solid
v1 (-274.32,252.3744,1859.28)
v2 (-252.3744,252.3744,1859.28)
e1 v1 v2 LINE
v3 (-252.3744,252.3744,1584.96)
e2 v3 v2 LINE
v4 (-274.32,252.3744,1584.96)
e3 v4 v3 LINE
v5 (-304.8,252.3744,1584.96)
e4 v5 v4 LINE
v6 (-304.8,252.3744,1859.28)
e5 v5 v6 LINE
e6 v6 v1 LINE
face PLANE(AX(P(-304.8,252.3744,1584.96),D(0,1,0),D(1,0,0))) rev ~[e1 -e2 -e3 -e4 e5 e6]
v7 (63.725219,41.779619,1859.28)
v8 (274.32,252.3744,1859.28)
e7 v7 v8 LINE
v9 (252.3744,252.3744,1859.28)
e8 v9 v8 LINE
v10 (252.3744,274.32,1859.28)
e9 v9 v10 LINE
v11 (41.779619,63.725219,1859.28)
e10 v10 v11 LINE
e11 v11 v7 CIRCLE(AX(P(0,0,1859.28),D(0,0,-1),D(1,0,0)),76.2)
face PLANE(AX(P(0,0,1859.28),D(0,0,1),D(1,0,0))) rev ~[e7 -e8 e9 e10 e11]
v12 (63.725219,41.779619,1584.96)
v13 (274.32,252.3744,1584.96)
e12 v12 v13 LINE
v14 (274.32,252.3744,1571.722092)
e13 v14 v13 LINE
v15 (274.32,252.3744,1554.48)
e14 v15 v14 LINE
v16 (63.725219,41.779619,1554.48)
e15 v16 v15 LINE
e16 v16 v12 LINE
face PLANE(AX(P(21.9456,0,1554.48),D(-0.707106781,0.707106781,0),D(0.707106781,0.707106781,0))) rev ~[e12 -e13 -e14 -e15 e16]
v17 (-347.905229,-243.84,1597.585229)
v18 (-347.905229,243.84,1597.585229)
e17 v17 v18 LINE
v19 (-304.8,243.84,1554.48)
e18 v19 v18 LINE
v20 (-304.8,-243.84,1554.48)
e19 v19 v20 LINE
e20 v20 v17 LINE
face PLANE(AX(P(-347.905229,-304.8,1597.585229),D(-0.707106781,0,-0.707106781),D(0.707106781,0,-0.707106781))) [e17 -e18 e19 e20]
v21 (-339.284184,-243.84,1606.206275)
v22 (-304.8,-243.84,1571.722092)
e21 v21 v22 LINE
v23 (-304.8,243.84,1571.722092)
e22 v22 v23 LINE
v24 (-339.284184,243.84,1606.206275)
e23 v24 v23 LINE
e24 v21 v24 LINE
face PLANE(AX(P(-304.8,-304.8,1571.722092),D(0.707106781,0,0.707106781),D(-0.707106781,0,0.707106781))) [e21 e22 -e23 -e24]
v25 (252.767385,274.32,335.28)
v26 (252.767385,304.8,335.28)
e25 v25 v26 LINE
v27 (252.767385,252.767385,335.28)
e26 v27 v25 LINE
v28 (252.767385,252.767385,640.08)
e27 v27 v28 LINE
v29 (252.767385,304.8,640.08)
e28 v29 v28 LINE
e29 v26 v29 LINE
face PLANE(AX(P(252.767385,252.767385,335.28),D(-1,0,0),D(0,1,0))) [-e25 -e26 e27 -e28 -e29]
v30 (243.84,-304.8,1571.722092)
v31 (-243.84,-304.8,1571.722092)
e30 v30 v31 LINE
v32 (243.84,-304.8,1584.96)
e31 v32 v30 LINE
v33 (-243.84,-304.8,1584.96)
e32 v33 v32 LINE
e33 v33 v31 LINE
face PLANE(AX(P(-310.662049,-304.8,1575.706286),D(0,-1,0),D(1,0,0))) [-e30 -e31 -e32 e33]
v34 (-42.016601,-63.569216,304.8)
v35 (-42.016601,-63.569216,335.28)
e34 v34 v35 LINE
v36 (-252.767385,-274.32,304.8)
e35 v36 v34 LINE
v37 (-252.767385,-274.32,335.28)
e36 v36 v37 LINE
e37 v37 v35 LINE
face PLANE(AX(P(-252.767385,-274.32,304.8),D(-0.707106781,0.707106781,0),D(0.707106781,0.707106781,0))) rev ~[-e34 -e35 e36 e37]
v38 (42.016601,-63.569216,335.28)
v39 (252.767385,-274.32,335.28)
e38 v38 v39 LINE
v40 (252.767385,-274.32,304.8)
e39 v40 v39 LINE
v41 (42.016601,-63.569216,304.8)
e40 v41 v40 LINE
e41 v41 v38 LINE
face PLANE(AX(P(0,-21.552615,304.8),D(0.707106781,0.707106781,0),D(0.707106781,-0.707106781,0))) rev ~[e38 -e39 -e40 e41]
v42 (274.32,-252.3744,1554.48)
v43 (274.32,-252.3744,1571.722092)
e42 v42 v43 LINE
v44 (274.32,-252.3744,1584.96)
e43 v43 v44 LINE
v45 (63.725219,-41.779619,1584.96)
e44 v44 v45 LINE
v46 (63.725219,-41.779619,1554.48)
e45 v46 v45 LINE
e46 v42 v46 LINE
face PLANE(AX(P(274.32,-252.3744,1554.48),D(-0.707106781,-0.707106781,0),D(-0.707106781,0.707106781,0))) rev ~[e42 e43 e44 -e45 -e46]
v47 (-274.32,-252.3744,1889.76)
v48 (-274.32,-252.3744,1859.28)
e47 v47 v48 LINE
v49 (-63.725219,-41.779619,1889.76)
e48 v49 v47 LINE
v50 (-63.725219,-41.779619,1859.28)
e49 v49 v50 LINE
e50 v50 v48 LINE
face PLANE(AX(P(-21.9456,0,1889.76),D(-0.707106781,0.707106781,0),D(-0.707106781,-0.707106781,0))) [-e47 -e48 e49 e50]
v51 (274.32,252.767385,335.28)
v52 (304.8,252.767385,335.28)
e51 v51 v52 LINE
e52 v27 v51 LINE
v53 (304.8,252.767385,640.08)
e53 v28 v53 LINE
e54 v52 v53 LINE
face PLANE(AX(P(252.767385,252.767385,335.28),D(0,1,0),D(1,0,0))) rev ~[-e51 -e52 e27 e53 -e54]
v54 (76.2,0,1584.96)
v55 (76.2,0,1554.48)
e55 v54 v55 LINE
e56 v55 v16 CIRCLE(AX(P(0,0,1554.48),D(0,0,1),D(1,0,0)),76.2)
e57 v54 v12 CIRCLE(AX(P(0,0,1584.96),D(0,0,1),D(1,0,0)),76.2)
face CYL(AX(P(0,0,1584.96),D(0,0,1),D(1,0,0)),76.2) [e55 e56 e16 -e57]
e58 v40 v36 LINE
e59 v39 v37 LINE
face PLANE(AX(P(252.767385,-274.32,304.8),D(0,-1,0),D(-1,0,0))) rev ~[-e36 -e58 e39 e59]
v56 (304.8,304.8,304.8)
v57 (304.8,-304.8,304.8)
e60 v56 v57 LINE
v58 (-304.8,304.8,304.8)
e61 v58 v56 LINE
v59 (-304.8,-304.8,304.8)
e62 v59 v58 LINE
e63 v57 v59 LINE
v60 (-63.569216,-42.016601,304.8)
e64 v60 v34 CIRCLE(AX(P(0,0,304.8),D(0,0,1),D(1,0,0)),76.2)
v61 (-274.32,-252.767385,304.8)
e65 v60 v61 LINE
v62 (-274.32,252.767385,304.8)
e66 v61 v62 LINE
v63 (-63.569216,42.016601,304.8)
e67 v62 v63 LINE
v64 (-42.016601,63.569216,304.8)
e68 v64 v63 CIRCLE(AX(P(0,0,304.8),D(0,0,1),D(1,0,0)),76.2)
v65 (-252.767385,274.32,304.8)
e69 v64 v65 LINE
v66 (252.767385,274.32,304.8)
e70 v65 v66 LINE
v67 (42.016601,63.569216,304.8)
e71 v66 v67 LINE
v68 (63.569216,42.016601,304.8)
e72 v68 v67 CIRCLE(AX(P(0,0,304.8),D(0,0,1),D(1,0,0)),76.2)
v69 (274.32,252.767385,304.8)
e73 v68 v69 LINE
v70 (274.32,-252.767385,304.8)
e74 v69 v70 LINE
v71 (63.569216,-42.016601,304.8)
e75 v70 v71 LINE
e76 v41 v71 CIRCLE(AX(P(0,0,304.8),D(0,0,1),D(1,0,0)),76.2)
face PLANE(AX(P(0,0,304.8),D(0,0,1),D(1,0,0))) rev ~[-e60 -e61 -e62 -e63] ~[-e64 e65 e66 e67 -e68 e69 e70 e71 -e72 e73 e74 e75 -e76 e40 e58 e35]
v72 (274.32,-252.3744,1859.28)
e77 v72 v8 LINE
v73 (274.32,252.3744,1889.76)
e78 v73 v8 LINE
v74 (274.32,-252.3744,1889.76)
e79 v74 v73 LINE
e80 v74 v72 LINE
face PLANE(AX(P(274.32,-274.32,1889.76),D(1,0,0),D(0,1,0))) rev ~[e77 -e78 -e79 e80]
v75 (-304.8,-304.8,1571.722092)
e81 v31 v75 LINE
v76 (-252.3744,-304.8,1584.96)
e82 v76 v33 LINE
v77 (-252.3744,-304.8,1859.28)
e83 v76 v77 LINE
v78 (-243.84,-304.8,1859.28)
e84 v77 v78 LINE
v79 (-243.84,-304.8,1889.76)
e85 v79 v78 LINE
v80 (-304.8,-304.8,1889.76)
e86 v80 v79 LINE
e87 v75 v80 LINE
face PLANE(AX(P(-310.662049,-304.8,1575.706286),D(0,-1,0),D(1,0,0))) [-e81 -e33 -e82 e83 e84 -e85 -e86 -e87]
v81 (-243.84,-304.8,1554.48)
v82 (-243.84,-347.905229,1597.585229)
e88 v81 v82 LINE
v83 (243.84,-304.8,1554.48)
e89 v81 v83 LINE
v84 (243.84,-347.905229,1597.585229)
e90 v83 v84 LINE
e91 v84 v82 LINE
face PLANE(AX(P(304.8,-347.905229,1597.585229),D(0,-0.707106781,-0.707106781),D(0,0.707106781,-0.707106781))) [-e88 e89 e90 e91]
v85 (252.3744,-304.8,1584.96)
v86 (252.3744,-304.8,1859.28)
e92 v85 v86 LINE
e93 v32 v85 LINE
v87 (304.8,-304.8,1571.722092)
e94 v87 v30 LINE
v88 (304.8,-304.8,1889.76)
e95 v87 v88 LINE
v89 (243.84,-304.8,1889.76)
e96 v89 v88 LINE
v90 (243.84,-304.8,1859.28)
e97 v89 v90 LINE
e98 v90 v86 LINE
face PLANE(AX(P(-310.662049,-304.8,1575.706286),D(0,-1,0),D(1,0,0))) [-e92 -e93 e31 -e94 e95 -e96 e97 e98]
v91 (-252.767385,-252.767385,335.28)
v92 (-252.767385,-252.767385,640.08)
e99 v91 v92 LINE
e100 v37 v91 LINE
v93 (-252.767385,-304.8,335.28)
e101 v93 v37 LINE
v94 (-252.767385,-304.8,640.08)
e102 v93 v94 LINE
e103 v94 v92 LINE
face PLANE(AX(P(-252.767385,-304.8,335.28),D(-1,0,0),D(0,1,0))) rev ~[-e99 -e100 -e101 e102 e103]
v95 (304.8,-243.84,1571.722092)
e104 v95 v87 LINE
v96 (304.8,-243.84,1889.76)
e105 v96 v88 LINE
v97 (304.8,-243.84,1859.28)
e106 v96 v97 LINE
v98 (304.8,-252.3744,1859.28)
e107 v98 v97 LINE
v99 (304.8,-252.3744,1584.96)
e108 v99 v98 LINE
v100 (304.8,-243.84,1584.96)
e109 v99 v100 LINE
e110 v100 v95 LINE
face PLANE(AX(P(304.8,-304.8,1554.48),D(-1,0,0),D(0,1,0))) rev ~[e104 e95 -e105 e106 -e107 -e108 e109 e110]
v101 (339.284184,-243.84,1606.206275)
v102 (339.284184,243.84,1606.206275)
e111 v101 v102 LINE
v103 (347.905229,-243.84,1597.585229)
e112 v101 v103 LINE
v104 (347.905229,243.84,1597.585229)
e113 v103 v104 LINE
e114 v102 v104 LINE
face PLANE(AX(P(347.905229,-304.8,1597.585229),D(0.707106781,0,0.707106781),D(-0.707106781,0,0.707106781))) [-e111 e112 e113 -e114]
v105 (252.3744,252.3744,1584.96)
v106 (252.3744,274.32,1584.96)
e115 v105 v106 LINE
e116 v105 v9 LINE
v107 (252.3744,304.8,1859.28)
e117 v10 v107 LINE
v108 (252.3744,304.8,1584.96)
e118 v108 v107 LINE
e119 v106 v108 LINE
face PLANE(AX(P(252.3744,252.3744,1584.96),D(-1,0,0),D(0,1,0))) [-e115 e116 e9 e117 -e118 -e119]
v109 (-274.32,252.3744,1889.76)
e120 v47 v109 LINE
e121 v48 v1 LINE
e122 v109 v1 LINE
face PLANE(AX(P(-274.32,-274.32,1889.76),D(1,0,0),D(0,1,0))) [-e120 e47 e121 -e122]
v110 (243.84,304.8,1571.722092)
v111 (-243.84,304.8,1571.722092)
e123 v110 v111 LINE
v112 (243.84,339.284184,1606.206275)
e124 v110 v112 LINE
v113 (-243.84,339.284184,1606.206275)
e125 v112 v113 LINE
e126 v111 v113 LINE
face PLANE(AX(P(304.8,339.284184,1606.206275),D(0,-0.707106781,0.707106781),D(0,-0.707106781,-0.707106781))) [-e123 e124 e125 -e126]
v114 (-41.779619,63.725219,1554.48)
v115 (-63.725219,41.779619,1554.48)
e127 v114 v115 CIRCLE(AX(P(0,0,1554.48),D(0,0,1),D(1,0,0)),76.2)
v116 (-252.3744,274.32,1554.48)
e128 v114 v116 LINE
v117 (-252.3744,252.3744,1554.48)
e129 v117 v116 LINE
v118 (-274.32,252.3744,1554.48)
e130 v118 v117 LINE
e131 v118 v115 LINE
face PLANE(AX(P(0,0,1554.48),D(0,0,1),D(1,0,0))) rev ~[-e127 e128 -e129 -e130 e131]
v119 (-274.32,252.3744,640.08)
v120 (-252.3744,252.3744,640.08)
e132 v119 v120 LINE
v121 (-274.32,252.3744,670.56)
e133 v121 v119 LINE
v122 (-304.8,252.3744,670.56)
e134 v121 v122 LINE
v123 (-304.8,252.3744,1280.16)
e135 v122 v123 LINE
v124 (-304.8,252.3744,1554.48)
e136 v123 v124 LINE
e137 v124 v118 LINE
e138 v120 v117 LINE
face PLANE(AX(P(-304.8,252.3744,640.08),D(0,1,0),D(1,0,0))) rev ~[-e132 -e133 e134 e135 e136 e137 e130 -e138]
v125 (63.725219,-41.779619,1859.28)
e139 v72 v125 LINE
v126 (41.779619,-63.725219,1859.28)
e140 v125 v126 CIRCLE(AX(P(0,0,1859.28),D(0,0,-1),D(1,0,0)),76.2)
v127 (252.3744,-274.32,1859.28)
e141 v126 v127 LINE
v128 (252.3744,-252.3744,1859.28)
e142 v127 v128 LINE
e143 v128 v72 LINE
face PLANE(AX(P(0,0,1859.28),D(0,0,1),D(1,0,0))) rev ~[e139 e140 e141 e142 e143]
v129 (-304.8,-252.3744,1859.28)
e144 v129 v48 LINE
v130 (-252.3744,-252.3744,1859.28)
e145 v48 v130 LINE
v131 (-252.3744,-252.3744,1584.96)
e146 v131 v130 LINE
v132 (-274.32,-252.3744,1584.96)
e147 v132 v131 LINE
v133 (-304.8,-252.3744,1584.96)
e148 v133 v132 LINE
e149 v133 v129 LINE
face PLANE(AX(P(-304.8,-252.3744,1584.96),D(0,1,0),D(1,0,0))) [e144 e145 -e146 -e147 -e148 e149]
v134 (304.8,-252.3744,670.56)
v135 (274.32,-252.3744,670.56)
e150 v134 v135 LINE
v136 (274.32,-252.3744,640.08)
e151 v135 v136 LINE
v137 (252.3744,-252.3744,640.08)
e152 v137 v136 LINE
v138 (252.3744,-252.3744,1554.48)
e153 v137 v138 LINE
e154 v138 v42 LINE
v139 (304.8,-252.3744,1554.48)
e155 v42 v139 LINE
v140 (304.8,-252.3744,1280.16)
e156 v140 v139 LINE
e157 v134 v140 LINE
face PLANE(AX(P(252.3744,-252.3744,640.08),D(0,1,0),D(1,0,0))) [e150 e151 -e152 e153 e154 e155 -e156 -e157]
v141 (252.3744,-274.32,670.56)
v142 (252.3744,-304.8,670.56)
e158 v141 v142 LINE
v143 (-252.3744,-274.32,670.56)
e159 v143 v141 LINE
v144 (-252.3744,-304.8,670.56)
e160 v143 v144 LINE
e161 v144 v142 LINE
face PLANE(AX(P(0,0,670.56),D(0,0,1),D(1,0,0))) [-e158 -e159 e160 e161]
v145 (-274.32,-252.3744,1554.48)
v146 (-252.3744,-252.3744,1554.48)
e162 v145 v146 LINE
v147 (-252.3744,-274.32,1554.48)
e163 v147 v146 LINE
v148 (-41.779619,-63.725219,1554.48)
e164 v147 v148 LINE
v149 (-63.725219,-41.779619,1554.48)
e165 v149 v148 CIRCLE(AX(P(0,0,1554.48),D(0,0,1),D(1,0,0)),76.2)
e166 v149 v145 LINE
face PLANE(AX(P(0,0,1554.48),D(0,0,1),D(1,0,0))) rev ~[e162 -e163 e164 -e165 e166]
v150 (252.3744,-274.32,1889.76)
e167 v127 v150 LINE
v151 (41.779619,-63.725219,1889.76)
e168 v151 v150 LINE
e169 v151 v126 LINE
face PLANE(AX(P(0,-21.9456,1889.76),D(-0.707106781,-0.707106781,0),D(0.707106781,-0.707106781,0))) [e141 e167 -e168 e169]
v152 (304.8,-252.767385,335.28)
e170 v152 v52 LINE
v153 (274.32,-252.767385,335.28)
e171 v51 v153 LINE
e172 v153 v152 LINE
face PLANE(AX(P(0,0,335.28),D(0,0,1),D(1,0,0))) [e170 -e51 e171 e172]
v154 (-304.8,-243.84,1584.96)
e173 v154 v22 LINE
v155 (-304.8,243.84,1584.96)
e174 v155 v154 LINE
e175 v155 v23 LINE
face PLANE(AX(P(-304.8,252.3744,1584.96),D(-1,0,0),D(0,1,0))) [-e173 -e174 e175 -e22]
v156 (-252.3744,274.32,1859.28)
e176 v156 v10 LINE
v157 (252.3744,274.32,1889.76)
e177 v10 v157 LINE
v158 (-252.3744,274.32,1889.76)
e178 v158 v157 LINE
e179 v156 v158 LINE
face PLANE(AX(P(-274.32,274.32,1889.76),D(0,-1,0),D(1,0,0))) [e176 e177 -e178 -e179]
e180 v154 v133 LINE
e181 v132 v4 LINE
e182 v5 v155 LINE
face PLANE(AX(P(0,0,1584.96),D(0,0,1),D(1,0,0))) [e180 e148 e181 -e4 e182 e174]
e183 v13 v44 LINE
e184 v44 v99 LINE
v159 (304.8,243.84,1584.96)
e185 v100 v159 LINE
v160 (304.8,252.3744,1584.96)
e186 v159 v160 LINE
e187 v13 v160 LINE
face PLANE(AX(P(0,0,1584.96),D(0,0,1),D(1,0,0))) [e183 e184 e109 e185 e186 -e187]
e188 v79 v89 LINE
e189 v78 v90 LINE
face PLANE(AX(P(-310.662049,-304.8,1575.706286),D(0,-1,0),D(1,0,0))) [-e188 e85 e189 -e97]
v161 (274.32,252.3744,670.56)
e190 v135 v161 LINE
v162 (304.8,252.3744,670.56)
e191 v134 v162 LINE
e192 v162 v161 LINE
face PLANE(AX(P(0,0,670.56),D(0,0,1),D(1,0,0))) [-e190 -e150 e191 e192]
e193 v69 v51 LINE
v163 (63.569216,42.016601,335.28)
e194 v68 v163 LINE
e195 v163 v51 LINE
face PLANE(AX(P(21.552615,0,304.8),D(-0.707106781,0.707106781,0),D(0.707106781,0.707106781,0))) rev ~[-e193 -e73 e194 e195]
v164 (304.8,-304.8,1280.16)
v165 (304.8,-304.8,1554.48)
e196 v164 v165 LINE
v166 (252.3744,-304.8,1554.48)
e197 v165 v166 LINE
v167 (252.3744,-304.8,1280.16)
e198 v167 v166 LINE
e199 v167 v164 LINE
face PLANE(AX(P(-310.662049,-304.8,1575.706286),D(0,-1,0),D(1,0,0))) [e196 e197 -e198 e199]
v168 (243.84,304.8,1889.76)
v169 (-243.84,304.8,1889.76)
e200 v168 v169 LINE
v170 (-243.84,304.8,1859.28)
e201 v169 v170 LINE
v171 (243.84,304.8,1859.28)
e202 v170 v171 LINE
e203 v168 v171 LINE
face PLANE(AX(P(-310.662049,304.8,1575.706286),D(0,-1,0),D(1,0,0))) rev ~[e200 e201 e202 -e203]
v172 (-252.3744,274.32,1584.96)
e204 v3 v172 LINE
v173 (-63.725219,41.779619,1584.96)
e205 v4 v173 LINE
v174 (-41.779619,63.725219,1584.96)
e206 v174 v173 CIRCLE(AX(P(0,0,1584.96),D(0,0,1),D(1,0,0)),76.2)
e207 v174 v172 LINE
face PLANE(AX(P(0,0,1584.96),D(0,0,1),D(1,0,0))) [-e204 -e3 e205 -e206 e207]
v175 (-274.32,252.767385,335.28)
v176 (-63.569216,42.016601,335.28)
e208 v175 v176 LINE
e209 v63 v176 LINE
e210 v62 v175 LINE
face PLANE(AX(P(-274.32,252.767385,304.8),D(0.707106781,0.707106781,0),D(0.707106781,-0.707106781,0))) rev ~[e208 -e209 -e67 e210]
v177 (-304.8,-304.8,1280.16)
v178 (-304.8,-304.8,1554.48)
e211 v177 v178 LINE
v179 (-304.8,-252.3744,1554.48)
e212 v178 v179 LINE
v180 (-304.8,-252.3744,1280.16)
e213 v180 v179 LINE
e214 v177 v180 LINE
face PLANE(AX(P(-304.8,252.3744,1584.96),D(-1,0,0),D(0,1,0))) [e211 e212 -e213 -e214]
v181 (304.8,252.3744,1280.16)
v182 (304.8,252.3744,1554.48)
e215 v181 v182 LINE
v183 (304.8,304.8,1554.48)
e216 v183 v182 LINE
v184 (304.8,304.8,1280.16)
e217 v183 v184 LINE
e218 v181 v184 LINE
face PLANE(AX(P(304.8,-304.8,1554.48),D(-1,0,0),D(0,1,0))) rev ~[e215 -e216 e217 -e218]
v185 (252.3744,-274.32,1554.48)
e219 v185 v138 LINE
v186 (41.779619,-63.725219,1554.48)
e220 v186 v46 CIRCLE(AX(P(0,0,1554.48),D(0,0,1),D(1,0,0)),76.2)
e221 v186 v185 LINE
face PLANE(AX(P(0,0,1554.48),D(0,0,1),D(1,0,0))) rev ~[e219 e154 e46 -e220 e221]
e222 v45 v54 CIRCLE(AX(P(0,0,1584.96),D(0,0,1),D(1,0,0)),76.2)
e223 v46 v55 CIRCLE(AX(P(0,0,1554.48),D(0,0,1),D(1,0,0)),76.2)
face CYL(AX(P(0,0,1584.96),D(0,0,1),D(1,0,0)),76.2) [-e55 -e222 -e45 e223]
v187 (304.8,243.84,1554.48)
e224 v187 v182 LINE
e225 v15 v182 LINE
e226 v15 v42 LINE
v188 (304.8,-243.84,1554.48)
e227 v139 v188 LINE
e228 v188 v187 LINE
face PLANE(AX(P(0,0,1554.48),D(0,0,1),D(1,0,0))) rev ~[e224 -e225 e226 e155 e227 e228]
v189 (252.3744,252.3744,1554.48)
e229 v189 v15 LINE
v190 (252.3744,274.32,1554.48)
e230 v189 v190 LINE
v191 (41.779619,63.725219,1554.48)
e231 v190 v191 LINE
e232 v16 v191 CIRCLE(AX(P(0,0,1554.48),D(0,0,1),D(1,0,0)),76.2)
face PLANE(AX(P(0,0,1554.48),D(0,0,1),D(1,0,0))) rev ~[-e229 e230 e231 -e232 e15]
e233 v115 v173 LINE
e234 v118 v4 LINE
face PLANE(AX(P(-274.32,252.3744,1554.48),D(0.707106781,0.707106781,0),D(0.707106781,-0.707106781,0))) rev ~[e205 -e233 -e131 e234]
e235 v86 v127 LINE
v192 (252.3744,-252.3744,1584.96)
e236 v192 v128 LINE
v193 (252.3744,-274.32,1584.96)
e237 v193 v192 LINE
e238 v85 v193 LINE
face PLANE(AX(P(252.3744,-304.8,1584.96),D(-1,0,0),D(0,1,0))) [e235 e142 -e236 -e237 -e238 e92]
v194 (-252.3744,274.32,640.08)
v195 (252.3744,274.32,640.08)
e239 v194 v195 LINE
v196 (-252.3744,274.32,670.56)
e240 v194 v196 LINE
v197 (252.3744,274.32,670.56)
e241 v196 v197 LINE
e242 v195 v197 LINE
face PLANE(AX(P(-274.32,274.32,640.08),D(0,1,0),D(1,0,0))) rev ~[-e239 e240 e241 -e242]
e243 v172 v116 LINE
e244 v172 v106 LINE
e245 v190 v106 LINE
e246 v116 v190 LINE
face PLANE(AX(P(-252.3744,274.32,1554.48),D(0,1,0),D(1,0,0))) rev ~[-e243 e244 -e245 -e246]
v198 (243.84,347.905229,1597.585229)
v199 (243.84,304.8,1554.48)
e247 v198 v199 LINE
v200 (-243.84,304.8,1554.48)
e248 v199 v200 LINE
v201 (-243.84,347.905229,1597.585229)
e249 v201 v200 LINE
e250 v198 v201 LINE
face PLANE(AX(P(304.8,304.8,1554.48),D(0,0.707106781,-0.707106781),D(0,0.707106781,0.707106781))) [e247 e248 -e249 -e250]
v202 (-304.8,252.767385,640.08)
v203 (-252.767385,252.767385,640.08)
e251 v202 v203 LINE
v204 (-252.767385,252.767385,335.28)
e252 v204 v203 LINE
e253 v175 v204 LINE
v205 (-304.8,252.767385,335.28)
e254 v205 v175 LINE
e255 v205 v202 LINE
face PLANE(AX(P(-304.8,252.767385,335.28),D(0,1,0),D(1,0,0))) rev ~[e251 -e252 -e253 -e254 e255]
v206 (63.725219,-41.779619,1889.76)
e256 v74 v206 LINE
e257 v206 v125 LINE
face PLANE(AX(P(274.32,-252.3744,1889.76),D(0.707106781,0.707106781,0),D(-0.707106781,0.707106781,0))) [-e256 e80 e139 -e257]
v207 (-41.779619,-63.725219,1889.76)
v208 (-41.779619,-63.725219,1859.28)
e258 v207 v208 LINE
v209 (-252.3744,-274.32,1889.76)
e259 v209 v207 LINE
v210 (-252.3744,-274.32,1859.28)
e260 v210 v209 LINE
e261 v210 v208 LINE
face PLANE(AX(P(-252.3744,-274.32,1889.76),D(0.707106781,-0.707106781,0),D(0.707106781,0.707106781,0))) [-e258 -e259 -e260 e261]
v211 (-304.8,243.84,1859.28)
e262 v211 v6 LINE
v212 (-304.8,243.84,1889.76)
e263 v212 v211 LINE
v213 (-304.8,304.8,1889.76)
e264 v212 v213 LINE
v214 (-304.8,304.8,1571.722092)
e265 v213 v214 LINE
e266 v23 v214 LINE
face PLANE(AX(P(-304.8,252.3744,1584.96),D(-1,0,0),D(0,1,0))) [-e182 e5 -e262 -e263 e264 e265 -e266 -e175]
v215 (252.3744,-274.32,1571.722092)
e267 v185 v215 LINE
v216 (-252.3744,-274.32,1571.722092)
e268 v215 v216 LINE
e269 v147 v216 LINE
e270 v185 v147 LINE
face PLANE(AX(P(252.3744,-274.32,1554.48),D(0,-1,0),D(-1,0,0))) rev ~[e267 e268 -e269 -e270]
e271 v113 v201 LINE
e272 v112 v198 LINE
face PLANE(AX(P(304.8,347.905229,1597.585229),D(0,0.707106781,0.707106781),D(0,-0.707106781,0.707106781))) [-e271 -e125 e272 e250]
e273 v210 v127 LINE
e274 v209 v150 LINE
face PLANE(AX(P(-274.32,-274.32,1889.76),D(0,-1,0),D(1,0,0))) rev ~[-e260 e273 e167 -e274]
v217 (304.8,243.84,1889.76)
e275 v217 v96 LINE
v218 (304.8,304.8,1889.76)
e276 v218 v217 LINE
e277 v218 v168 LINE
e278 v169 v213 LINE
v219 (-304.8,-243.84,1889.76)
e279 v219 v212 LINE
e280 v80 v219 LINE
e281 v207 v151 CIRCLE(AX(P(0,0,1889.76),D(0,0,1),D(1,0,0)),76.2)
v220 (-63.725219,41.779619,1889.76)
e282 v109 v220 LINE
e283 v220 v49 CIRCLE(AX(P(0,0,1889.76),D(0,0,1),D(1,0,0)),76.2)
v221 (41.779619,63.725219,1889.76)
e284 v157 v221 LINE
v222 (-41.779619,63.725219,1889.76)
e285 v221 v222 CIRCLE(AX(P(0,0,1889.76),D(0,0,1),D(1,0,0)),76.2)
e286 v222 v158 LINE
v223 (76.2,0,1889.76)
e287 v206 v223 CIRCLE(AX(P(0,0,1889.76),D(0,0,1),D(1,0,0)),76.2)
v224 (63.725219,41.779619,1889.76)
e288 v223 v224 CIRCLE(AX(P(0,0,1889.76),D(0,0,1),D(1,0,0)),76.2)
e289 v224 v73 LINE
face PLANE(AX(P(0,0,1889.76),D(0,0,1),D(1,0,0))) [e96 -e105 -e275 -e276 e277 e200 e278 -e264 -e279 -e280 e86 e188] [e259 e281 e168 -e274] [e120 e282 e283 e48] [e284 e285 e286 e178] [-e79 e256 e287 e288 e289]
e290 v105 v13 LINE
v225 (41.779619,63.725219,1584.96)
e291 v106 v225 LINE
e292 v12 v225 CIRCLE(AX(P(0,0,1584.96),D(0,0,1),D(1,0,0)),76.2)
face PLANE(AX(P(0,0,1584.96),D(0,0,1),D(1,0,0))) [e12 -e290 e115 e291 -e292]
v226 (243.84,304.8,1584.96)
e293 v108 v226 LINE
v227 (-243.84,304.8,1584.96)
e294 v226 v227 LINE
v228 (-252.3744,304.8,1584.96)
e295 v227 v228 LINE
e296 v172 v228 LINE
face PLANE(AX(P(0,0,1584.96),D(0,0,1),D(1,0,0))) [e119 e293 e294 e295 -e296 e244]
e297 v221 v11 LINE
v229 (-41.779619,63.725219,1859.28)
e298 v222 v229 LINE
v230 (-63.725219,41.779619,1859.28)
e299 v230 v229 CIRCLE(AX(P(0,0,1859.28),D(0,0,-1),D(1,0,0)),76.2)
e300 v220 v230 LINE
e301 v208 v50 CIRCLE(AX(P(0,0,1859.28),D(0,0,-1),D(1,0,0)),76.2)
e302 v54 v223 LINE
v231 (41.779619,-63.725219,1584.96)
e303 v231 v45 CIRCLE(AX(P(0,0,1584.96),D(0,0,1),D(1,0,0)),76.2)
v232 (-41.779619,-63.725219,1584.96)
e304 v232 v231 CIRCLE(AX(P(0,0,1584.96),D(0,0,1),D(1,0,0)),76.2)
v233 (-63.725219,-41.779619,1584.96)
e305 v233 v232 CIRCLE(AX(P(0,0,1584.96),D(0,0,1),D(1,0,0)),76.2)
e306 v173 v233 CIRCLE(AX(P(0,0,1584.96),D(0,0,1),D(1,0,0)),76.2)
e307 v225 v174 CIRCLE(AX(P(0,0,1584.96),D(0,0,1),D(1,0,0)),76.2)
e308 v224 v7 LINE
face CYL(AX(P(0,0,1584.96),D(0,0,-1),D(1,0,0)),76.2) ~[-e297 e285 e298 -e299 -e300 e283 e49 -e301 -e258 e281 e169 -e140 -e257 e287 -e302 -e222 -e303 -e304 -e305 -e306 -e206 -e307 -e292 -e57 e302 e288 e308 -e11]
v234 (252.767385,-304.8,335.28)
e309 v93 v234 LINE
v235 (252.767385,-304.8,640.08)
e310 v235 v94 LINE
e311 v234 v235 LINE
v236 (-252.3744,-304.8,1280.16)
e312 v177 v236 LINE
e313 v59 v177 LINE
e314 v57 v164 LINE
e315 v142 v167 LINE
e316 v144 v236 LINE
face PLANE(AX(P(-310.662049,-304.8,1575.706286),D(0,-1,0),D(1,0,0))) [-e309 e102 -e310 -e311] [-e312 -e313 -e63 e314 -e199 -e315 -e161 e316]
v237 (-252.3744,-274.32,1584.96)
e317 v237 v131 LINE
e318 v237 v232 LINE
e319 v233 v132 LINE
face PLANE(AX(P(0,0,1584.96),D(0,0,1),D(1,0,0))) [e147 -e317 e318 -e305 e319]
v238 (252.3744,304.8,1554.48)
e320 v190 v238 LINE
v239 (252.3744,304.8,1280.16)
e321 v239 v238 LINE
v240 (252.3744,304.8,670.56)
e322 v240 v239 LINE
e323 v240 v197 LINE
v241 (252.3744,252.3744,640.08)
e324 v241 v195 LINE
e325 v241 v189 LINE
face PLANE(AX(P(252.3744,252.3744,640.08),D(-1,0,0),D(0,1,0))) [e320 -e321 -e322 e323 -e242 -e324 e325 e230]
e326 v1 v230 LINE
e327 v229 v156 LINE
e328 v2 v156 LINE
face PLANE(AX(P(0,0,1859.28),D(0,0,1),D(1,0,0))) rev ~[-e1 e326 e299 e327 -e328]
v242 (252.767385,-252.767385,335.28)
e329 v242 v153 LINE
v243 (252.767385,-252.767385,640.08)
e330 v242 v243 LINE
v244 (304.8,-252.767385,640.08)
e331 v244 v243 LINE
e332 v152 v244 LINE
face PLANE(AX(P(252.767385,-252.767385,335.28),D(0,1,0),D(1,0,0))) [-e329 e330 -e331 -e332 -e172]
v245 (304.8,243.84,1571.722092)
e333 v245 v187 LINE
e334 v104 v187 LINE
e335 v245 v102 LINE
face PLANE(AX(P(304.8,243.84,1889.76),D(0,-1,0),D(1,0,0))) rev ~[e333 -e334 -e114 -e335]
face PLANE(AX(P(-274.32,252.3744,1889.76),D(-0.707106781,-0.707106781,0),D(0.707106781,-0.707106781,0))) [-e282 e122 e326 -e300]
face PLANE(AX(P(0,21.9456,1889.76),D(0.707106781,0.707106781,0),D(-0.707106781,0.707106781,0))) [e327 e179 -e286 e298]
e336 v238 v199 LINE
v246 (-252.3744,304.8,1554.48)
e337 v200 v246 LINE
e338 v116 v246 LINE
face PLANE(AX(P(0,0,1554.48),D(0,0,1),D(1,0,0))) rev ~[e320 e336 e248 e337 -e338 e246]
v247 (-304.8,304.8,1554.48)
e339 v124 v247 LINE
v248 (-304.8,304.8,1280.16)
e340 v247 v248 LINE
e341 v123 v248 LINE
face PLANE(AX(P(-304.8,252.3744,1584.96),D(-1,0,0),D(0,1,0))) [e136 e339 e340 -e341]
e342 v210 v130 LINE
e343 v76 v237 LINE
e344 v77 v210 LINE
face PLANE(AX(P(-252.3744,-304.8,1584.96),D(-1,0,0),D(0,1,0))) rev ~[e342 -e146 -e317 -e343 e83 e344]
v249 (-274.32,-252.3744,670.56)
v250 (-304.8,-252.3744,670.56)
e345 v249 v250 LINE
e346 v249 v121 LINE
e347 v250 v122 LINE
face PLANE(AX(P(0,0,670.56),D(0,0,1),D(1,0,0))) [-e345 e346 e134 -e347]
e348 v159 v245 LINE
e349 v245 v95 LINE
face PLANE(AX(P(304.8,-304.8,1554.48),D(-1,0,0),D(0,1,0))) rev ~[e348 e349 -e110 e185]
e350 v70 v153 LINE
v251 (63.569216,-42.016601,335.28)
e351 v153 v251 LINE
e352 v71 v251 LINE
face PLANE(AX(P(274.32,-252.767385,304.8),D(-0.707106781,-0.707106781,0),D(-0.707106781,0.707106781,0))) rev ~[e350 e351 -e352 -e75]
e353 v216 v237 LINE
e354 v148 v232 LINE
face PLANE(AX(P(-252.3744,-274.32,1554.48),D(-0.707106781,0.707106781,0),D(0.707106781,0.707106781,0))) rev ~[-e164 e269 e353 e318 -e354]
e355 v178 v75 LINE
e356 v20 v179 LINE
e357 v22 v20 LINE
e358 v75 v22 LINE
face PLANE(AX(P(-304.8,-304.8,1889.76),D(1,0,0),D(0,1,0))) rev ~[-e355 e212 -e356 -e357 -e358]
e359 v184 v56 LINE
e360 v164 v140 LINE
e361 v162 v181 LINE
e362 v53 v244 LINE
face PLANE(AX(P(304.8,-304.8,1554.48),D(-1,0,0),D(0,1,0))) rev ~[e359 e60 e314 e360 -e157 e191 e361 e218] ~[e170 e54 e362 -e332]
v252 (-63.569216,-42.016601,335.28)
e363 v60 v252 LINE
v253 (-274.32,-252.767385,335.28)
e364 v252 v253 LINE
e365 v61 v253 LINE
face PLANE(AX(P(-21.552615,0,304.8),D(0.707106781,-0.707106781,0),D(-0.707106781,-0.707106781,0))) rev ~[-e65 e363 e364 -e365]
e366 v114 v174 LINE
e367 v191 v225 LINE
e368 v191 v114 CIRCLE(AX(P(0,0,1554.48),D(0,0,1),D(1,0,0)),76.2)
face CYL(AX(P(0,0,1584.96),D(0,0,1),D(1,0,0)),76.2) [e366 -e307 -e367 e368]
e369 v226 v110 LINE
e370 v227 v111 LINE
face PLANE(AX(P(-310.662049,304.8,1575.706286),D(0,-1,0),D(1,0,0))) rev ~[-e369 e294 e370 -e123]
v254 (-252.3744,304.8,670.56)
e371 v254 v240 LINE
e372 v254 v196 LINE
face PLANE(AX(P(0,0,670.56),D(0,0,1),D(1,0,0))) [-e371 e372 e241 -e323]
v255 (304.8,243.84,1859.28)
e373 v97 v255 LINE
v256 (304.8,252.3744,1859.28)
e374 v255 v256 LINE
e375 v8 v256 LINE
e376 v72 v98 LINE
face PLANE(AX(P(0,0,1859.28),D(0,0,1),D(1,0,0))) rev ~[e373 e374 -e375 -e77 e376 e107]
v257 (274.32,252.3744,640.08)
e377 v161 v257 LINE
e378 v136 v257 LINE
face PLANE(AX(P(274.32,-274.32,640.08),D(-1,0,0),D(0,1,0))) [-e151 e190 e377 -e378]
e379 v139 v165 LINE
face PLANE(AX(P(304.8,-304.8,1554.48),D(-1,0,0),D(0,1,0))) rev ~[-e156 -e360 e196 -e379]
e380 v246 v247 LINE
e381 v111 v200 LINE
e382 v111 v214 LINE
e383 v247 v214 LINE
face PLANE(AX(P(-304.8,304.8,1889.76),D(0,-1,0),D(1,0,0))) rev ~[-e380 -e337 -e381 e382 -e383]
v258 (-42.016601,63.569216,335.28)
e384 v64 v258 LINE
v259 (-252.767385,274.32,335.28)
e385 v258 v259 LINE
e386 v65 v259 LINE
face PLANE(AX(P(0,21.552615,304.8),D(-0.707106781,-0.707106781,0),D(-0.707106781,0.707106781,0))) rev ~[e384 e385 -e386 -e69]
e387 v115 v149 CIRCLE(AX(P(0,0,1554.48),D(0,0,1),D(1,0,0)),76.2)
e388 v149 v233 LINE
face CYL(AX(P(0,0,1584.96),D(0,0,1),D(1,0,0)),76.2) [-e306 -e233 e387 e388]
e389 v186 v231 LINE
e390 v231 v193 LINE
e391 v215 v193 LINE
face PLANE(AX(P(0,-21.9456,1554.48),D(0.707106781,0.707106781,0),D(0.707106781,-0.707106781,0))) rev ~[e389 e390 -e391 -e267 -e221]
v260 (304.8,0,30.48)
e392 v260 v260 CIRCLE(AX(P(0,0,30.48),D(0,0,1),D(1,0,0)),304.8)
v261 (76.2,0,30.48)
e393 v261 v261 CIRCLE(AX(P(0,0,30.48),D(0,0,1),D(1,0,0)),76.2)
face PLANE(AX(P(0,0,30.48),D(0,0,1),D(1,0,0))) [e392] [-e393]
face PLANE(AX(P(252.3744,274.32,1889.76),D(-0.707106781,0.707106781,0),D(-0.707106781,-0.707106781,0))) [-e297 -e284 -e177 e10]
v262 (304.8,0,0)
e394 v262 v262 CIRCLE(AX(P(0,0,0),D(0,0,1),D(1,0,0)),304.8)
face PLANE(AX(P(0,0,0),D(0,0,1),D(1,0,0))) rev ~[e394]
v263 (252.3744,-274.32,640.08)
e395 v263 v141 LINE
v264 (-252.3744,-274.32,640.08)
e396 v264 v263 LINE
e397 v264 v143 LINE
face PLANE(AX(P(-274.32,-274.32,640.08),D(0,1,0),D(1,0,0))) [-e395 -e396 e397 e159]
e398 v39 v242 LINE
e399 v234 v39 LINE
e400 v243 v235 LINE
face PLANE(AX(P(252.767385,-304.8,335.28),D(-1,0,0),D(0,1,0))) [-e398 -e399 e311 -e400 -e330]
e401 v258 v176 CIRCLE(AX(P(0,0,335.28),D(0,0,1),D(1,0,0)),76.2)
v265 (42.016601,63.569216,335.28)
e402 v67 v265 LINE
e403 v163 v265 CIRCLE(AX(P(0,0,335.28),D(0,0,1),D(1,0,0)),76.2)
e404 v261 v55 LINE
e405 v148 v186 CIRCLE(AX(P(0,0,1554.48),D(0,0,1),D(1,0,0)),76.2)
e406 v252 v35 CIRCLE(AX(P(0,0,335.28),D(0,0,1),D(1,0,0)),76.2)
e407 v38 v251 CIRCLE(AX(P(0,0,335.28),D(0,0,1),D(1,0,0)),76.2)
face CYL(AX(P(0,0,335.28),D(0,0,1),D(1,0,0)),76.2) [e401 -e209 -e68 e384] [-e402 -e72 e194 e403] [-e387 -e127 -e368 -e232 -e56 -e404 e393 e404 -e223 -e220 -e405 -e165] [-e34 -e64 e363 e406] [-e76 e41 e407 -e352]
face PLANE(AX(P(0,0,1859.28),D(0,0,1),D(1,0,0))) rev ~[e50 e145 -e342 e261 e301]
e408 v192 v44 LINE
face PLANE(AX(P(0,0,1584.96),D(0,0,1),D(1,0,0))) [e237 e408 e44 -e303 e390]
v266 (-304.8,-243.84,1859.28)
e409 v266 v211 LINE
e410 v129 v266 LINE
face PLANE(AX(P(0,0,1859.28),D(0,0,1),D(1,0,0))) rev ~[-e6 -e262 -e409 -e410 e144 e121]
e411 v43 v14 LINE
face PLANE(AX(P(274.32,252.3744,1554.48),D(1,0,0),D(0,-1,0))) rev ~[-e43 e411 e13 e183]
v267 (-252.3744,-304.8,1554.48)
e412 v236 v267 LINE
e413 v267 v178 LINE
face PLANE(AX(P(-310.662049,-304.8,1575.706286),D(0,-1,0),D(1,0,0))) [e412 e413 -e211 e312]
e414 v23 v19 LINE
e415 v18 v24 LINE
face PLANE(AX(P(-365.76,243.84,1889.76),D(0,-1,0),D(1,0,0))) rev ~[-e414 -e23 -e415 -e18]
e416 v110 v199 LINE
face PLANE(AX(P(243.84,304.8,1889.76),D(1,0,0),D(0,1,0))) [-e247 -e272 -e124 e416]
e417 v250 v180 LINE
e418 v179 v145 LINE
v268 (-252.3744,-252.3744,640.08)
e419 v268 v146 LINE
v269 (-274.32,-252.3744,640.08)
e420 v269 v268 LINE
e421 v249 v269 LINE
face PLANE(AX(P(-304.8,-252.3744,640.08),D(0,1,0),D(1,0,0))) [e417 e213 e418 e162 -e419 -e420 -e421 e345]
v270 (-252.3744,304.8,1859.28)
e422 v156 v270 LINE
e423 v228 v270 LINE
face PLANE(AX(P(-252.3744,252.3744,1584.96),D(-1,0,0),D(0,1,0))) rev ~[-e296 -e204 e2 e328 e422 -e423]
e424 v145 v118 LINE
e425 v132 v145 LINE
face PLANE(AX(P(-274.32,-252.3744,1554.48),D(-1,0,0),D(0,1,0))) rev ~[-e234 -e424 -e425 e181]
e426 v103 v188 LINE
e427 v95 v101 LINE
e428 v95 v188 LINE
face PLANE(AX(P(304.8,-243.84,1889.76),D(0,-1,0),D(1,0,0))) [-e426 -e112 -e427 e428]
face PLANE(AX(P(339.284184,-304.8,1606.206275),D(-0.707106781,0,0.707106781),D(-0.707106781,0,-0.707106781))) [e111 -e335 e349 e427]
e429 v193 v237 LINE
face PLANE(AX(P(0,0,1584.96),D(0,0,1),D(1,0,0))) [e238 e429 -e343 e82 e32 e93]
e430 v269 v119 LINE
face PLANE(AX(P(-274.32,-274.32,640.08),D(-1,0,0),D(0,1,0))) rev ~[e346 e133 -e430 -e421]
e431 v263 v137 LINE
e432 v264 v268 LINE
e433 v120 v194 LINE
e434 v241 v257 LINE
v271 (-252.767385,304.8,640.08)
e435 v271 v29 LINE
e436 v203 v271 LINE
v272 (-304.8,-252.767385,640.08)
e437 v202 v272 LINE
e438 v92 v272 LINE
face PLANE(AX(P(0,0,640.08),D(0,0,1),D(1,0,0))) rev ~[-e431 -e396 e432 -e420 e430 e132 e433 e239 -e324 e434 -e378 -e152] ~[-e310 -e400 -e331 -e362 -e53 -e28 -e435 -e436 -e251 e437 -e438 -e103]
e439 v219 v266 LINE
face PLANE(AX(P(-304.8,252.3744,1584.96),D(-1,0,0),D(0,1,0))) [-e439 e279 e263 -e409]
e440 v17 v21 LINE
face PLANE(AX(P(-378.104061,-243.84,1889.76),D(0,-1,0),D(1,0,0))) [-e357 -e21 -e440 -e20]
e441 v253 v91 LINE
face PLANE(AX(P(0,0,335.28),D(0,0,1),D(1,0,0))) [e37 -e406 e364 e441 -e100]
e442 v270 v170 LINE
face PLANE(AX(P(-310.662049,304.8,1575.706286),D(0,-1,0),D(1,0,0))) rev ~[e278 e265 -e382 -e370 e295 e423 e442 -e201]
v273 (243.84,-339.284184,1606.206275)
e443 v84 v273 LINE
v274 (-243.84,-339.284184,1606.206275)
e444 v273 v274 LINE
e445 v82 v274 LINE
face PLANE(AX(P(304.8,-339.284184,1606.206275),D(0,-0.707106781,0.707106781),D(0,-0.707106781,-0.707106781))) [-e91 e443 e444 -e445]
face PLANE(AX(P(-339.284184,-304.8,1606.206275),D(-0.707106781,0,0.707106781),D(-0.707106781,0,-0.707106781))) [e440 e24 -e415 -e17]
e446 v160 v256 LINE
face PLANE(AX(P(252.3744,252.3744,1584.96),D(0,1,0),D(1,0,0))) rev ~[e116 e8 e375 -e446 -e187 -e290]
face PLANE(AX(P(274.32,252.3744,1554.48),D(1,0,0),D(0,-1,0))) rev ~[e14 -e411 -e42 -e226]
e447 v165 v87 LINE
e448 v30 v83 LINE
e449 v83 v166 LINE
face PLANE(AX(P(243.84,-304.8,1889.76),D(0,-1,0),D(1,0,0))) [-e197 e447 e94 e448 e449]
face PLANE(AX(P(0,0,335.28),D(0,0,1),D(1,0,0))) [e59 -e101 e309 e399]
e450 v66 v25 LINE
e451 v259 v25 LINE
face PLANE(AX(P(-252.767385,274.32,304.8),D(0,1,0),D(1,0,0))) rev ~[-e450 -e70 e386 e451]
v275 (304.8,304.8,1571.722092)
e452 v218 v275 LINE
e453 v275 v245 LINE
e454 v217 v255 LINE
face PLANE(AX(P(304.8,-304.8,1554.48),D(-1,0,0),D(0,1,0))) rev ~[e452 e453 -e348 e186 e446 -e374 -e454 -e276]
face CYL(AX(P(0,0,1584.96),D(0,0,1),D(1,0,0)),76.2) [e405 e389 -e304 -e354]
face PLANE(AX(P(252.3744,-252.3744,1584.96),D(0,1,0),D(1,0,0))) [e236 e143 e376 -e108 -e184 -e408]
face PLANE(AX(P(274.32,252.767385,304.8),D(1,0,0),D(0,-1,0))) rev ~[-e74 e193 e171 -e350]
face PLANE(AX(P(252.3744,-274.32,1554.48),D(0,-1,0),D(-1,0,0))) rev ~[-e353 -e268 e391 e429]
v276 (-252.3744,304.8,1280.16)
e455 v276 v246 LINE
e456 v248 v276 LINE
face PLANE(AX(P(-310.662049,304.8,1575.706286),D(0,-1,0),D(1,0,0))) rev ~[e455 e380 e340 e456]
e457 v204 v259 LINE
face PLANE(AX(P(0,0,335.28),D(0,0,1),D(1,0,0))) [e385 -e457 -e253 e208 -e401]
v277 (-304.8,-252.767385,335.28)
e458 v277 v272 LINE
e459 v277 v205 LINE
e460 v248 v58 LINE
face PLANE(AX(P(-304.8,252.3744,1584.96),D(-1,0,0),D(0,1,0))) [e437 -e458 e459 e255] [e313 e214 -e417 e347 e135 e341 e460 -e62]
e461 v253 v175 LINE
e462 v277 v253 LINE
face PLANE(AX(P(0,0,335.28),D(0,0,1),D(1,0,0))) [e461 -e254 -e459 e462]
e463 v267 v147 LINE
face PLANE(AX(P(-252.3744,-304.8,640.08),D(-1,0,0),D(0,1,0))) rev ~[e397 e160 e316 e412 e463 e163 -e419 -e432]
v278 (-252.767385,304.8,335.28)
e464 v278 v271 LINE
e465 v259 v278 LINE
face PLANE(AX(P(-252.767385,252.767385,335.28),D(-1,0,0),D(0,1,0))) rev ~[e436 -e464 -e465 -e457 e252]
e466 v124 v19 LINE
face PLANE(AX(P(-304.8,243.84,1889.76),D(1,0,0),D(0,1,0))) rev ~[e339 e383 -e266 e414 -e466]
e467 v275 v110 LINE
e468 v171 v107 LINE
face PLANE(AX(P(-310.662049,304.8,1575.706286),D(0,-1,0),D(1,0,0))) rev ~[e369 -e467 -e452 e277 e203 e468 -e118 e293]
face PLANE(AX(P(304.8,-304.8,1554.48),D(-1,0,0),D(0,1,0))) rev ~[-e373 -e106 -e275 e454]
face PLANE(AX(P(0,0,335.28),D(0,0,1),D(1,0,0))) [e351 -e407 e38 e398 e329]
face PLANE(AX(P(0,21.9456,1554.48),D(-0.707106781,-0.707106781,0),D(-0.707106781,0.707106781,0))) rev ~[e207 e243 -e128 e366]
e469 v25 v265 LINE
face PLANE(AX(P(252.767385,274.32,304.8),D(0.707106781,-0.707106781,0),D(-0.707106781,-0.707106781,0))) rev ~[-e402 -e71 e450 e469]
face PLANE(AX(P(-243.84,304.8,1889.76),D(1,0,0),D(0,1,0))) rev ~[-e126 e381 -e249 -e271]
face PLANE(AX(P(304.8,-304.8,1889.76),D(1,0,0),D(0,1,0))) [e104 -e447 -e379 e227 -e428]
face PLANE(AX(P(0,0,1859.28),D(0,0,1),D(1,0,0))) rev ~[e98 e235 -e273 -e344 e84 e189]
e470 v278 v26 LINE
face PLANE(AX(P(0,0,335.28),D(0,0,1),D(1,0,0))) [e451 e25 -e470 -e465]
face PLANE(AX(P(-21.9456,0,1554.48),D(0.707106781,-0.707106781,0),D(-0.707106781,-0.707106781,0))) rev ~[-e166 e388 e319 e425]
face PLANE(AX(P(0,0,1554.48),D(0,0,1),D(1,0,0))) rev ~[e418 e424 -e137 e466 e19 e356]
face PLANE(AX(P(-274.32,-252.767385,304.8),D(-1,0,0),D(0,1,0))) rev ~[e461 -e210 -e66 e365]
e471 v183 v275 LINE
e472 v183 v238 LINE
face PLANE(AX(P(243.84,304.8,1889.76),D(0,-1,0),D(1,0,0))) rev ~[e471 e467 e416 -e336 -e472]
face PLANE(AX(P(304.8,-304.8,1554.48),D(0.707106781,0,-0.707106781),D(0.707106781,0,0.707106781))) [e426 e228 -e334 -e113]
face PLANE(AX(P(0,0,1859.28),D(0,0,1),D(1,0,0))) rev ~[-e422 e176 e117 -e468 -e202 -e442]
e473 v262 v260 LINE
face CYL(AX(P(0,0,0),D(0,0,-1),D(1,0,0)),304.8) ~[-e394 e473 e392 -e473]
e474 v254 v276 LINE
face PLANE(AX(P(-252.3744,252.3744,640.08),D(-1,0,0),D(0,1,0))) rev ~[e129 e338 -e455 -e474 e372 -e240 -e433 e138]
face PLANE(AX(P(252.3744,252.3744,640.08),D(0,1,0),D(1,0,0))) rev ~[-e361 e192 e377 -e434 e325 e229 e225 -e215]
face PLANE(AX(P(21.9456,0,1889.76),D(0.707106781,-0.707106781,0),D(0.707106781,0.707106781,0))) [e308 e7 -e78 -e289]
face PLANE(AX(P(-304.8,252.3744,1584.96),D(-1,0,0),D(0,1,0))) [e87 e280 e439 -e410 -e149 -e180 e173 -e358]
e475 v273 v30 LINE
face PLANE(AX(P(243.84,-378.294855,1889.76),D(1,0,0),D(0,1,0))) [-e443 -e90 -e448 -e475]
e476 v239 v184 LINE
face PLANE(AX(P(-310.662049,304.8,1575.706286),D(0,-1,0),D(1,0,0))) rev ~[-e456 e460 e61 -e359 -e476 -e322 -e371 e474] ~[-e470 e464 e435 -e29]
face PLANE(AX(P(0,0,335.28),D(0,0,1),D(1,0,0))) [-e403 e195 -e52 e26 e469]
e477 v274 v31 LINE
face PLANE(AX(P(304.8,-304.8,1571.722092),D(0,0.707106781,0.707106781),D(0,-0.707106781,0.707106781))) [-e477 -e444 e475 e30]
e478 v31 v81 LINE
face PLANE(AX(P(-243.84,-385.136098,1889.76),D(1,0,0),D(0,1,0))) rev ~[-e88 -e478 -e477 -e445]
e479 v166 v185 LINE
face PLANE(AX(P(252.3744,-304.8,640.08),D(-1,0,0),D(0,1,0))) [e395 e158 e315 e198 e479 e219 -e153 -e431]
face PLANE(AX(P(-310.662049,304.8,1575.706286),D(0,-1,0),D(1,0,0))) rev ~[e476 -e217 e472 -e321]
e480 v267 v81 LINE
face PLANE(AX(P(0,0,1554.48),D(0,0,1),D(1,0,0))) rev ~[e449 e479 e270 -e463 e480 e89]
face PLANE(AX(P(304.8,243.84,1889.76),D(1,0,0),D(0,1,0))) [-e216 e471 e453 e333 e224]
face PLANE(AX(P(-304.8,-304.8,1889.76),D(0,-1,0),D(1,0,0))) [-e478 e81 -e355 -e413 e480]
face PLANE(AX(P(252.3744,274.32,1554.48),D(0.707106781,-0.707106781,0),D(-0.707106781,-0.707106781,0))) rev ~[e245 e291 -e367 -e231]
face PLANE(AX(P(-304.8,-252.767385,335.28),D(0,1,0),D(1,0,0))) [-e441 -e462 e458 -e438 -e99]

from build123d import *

# Parameters (mm, degrees)
F0_R           = 304.8
F1_DEPTH       = 30.48
F2_R           = 76.2
F3_DEPTH       = 274.32
F4_W           = 609.6
F4_H           = 609.6
F5_DEPTH       = 30.48
F6_R           = 76.2
F6_W           = 52.0326146906
F6_H           = 52.0326146906
F7_DEPTH       = 304.8
F7_DEPTH_BACK  = 30.48
F8_W           = 609.6
F8_H           = 609.6
F8_W_2         = 548.64
F8_H_2         = 548.64
F9_DEPTH       = 30.48
F10_W          = 52.4256
F10_H          = 52.4256
F10_R          = 76.2
F11_DEPTH      = 914.4
F13_DEPTH      = 30.48
F14_W          = 52.4256
F14_H          = 52.4256
F14_R          = 76.2
F15_DEPTH      = 304.8
F15_DEPTH_BACK = 30.48
F16_W          = 609.6
F16_H          = 609.6
F16_W_2        = 548.64
F16_H_2        = 548.64
F17_DEPTH      = 30.48
F20_DEPTH      = 609.6
F22_DEPTH      = 609.6
F23_DEPTH      = 30.48
F24_W          = 60.96
F24_H          = 72.17660923
F24_H_2        = 60.96
F24_H_3        = 74.9131180763
F24_W_2        = 86.0498287201
F24_W_3        = 73.7356283188
F24_H_4        = 73.4948553562
F24_H_5        = 80.3360976696
F24_W_4        = 73.3040608883
F25_DEPTH      = 609.6


# Not quite as in the source:
# - a feature names something its author has since deleted; it is built from what else it names


with BuildPart() as f1:
    # F0 (on Top) → F1 (new body)
    with BuildSketch(Plane.XY):
        Circle(F0_R)
    extrude(amount=F1_DEPTH)

    # F2 (on face) → F3 (join)
    with BuildSketch(Plane.XY.offset(30.48)):
        Circle(F2_R)
    extrude(amount=F3_DEPTH)

    # F4 (on face) → F5 (join)
    with BuildSketch(Plane.XY.offset(304.8)):
        Rectangle(F4_W, F4_H)
        Polygon((-21.5526146906, 0), (-274.32, -252.7673853094), (-274.32, 252.7673853094), align=None, mode=Mode.SUBTRACT)
        Polygon((0, -21.5526146906), (252.7673853094, -274.32), (-252.7673853094, -274.32), align=None, mode=Mode.SUBTRACT)
        Polygon((-252.7673853094, 274.32), (252.7673853094, 274.32), (0, 21.5526146906), align=None, mode=Mode.SUBTRACT)
        Polygon((274.32, 252.7673853094), (274.32, -252.7673853094), (21.5526146906, 0), align=None, mode=Mode.SUBTRACT)
    extrude(amount=F5_DEPTH)

    # F6 (on face) → F7 (join, two sides)
    with BuildSketch(Plane.XY.offset(335.28)) as f7_sk:
        Circle(F6_R)
        with Locations((-278.7836926547, 278.7836926547)):
            Rectangle(F6_W, F6_H)
        with Locations((278.7836926547, 278.7836926547)):
            Rectangle(F6_W, F6_H)
        with Locations((278.7836926547, -278.7836926547)):
            Rectangle(F6_W, F6_H)
        with Locations((-278.7836926547, -278.7836926547)):
            Rectangle(F6_W, F6_H)
    extrude(amount=F7_DEPTH)
    extrude(f7_sk.sketch, amount=-F7_DEPTH_BACK)

    # F8 (on face) → F9 (join)
    with BuildSketch(Plane.XY.offset(640.08)):
        Rectangle(F8_W, F8_H)
        Rectangle(F8_W_2, F8_H_2, mode=Mode.SUBTRACT)
    extrude(amount=F9_DEPTH)

    # F10 (on face) → F11 (join)
    with BuildSketch(Plane.XY.offset(640.08)):
        with Locations((-278.5872, 278.5872)):
            Rectangle(F10_W, F10_H)
        with Locations((-278.5872, -278.5872)):
            Rectangle(F10_W, F10_H)
        with Locations((278.5872, 278.5872)):
            Rectangle(F10_W, F10_H)
        with Locations((278.5872, -278.5872)):
            Rectangle(F10_W, F10_H)
        Circle(F10_R)
    extrude(amount=F11_DEPTH)

    # F12 (on face) → F13 (join)
    with BuildSketch(Plane.XY.offset(1554.48)):
        Polygon((252.3744, -304.8), (304.8, -304.8), (304.8, -252.3744), (304.8, 252.3744), (304.8, 304.8), (252.3744, 304.8), (-252.3744, 304.8), (-304.8, 304.8), (-304.8, 252.3744), (-304.8, -252.3744), (-304.8, -304.8), (-252.3744, -304.8), align=None)
        Polygon((252.3744, -274.32), (-252.3744, -274.32), (0, -21.9456), align=None, mode=Mode.SUBTRACT)
        Polygon((-274.32, -252.3744), (-274.32, 252.3744), (-21.9456, 0), align=None, mode=Mode.SUBTRACT)
        Polygon((21.9456, 0), (274.32, 252.3744), (274.32, -252.3744), align=None, mode=Mode.SUBTRACT)
        Polygon((0, 21.9456), (-252.3744, 274.32), (252.3744, 274.32), align=None, mode=Mode.SUBTRACT)
    extrude(amount=F13_DEPTH)

    # F14 (on face) → F15 (join, two sides)
    with BuildSketch(Plane.XY.offset(1584.96)) as f15_sk:
        with Locations((-278.5872, 278.5872)):
            Rectangle(F14_W, F14_H)
        with Locations((278.5872, 278.5872)):
            Rectangle(F14_W, F14_H)
        with Locations((278.5872, -278.5872)):
            Rectangle(F14_W, F14_H)
        with Locations((-278.5872, -278.5872)):
            Rectangle(F14_W, F14_H)
        Circle(F14_R)
    extrude(amount=F15_DEPTH)
    extrude(f15_sk.sketch, amount=-F15_DEPTH_BACK)

    # F16 (on face) → F17 (join)
    with BuildSketch(Plane.XY.offset(1889.76)):
        Rectangle(F16_W, F16_H)
        Rectangle(F16_W_2, F16_H_2, mode=Mode.SUBTRACT)
    extrude(amount=-F17_DEPTH)

    # F19 (on face) → F20 (join)
    with BuildSketch(Plane.XZ.offset(304.8)):
        Polygon((-347.9052293811, 1597.5852293811), (-304.8, 1554.48), (-274.32, 1554.48), (-274.32, 1571.7220917525), (-304.8, 1571.7220917525), (-339.2841835049, 1606.2062752574), align=None)
        Polygon((274.32, 1554.48), (304.8, 1554.48), (347.9052293811, 1597.5852293811), (339.2841835049, 1606.2062752574), (304.8, 1571.7220917525), (274.32, 1571.7220917525), align=None)
    extrude(amount=-F20_DEPTH)

    # F21 (on face) → F22 (join)
    with BuildSketch(Plane.YZ.offset(304.8)):
        Polygon((274.32, 1571.7220917525), (274.32, 1554.48), (304.8, 1554.48), (347.9052293811, 1597.5852293811), (339.2841835049, 1606.2062752574), (304.8, 1571.7220917525), align=None)
        Polygon((-304.8, 1554.48), (-274.32, 1554.48), (-274.32, 1571.7220917525), (-304.8, 1571.7220917525), (-339.2841835049, 1606.2062752574), (-347.9052293811, 1597.5852293811), align=None)
    extrude(amount=-F22_DEPTH)

    # F18 (on face) → F23 (join)
    with BuildSketch(Plane.XY.offset(1889.76)):
        Polygon((0, 21.9456), (-252.3744, 274.32), (-274.32, 274.32), (-274.32, 252.3744), (-21.9456, 0), (-274.32, -252.3744), (-274.32, -274.32), (-252.3744, -274.32), (0, -21.9456), (252.3744, -274.32), (274.32, -274.32), (274.32, -252.3744), (21.9456, 0), (274.32, 252.3744), (274.32, 274.32), (252.3744, 274.32), align=None)
    extrude(amount=-F23_DEPTH)

    # F24 (on face) → F25 (cut)
    with BuildSketch(Plane.XY.offset(1889.76)):
        with Locations((-274.32, 340.888304615)):
            Rectangle(F24_W, F24_H)
        with Locations((-335.28, 274.32)):
            Rectangle(F24_W, F24_H_2)
        with Locations((274.32, 342.2565590382)):
            Rectangle(F24_W, F24_H_3)
        with Locations((347.82491436, 274.32)):
            Rectangle(F24_W_2, F24_H_2)
        with Locations((341.6678141594, -274.32)):
            Rectangle(F24_W_3, F24_H_2)
        with Locations((274.32, -341.5474276781)):
            Rectangle(F24_W, F24_H_4)
        with Locations((-274.32, -344.9680488348)):
            Rectangle(F24_W, F24_H_5)
        with Locations((-341.4520304441, -274.32)):
            Rectangle(F24_W_4, F24_H_2)
    extrude(amount=-F25_DEPTH, mode=Mode.SUBTRACT)


solid = f1.part
